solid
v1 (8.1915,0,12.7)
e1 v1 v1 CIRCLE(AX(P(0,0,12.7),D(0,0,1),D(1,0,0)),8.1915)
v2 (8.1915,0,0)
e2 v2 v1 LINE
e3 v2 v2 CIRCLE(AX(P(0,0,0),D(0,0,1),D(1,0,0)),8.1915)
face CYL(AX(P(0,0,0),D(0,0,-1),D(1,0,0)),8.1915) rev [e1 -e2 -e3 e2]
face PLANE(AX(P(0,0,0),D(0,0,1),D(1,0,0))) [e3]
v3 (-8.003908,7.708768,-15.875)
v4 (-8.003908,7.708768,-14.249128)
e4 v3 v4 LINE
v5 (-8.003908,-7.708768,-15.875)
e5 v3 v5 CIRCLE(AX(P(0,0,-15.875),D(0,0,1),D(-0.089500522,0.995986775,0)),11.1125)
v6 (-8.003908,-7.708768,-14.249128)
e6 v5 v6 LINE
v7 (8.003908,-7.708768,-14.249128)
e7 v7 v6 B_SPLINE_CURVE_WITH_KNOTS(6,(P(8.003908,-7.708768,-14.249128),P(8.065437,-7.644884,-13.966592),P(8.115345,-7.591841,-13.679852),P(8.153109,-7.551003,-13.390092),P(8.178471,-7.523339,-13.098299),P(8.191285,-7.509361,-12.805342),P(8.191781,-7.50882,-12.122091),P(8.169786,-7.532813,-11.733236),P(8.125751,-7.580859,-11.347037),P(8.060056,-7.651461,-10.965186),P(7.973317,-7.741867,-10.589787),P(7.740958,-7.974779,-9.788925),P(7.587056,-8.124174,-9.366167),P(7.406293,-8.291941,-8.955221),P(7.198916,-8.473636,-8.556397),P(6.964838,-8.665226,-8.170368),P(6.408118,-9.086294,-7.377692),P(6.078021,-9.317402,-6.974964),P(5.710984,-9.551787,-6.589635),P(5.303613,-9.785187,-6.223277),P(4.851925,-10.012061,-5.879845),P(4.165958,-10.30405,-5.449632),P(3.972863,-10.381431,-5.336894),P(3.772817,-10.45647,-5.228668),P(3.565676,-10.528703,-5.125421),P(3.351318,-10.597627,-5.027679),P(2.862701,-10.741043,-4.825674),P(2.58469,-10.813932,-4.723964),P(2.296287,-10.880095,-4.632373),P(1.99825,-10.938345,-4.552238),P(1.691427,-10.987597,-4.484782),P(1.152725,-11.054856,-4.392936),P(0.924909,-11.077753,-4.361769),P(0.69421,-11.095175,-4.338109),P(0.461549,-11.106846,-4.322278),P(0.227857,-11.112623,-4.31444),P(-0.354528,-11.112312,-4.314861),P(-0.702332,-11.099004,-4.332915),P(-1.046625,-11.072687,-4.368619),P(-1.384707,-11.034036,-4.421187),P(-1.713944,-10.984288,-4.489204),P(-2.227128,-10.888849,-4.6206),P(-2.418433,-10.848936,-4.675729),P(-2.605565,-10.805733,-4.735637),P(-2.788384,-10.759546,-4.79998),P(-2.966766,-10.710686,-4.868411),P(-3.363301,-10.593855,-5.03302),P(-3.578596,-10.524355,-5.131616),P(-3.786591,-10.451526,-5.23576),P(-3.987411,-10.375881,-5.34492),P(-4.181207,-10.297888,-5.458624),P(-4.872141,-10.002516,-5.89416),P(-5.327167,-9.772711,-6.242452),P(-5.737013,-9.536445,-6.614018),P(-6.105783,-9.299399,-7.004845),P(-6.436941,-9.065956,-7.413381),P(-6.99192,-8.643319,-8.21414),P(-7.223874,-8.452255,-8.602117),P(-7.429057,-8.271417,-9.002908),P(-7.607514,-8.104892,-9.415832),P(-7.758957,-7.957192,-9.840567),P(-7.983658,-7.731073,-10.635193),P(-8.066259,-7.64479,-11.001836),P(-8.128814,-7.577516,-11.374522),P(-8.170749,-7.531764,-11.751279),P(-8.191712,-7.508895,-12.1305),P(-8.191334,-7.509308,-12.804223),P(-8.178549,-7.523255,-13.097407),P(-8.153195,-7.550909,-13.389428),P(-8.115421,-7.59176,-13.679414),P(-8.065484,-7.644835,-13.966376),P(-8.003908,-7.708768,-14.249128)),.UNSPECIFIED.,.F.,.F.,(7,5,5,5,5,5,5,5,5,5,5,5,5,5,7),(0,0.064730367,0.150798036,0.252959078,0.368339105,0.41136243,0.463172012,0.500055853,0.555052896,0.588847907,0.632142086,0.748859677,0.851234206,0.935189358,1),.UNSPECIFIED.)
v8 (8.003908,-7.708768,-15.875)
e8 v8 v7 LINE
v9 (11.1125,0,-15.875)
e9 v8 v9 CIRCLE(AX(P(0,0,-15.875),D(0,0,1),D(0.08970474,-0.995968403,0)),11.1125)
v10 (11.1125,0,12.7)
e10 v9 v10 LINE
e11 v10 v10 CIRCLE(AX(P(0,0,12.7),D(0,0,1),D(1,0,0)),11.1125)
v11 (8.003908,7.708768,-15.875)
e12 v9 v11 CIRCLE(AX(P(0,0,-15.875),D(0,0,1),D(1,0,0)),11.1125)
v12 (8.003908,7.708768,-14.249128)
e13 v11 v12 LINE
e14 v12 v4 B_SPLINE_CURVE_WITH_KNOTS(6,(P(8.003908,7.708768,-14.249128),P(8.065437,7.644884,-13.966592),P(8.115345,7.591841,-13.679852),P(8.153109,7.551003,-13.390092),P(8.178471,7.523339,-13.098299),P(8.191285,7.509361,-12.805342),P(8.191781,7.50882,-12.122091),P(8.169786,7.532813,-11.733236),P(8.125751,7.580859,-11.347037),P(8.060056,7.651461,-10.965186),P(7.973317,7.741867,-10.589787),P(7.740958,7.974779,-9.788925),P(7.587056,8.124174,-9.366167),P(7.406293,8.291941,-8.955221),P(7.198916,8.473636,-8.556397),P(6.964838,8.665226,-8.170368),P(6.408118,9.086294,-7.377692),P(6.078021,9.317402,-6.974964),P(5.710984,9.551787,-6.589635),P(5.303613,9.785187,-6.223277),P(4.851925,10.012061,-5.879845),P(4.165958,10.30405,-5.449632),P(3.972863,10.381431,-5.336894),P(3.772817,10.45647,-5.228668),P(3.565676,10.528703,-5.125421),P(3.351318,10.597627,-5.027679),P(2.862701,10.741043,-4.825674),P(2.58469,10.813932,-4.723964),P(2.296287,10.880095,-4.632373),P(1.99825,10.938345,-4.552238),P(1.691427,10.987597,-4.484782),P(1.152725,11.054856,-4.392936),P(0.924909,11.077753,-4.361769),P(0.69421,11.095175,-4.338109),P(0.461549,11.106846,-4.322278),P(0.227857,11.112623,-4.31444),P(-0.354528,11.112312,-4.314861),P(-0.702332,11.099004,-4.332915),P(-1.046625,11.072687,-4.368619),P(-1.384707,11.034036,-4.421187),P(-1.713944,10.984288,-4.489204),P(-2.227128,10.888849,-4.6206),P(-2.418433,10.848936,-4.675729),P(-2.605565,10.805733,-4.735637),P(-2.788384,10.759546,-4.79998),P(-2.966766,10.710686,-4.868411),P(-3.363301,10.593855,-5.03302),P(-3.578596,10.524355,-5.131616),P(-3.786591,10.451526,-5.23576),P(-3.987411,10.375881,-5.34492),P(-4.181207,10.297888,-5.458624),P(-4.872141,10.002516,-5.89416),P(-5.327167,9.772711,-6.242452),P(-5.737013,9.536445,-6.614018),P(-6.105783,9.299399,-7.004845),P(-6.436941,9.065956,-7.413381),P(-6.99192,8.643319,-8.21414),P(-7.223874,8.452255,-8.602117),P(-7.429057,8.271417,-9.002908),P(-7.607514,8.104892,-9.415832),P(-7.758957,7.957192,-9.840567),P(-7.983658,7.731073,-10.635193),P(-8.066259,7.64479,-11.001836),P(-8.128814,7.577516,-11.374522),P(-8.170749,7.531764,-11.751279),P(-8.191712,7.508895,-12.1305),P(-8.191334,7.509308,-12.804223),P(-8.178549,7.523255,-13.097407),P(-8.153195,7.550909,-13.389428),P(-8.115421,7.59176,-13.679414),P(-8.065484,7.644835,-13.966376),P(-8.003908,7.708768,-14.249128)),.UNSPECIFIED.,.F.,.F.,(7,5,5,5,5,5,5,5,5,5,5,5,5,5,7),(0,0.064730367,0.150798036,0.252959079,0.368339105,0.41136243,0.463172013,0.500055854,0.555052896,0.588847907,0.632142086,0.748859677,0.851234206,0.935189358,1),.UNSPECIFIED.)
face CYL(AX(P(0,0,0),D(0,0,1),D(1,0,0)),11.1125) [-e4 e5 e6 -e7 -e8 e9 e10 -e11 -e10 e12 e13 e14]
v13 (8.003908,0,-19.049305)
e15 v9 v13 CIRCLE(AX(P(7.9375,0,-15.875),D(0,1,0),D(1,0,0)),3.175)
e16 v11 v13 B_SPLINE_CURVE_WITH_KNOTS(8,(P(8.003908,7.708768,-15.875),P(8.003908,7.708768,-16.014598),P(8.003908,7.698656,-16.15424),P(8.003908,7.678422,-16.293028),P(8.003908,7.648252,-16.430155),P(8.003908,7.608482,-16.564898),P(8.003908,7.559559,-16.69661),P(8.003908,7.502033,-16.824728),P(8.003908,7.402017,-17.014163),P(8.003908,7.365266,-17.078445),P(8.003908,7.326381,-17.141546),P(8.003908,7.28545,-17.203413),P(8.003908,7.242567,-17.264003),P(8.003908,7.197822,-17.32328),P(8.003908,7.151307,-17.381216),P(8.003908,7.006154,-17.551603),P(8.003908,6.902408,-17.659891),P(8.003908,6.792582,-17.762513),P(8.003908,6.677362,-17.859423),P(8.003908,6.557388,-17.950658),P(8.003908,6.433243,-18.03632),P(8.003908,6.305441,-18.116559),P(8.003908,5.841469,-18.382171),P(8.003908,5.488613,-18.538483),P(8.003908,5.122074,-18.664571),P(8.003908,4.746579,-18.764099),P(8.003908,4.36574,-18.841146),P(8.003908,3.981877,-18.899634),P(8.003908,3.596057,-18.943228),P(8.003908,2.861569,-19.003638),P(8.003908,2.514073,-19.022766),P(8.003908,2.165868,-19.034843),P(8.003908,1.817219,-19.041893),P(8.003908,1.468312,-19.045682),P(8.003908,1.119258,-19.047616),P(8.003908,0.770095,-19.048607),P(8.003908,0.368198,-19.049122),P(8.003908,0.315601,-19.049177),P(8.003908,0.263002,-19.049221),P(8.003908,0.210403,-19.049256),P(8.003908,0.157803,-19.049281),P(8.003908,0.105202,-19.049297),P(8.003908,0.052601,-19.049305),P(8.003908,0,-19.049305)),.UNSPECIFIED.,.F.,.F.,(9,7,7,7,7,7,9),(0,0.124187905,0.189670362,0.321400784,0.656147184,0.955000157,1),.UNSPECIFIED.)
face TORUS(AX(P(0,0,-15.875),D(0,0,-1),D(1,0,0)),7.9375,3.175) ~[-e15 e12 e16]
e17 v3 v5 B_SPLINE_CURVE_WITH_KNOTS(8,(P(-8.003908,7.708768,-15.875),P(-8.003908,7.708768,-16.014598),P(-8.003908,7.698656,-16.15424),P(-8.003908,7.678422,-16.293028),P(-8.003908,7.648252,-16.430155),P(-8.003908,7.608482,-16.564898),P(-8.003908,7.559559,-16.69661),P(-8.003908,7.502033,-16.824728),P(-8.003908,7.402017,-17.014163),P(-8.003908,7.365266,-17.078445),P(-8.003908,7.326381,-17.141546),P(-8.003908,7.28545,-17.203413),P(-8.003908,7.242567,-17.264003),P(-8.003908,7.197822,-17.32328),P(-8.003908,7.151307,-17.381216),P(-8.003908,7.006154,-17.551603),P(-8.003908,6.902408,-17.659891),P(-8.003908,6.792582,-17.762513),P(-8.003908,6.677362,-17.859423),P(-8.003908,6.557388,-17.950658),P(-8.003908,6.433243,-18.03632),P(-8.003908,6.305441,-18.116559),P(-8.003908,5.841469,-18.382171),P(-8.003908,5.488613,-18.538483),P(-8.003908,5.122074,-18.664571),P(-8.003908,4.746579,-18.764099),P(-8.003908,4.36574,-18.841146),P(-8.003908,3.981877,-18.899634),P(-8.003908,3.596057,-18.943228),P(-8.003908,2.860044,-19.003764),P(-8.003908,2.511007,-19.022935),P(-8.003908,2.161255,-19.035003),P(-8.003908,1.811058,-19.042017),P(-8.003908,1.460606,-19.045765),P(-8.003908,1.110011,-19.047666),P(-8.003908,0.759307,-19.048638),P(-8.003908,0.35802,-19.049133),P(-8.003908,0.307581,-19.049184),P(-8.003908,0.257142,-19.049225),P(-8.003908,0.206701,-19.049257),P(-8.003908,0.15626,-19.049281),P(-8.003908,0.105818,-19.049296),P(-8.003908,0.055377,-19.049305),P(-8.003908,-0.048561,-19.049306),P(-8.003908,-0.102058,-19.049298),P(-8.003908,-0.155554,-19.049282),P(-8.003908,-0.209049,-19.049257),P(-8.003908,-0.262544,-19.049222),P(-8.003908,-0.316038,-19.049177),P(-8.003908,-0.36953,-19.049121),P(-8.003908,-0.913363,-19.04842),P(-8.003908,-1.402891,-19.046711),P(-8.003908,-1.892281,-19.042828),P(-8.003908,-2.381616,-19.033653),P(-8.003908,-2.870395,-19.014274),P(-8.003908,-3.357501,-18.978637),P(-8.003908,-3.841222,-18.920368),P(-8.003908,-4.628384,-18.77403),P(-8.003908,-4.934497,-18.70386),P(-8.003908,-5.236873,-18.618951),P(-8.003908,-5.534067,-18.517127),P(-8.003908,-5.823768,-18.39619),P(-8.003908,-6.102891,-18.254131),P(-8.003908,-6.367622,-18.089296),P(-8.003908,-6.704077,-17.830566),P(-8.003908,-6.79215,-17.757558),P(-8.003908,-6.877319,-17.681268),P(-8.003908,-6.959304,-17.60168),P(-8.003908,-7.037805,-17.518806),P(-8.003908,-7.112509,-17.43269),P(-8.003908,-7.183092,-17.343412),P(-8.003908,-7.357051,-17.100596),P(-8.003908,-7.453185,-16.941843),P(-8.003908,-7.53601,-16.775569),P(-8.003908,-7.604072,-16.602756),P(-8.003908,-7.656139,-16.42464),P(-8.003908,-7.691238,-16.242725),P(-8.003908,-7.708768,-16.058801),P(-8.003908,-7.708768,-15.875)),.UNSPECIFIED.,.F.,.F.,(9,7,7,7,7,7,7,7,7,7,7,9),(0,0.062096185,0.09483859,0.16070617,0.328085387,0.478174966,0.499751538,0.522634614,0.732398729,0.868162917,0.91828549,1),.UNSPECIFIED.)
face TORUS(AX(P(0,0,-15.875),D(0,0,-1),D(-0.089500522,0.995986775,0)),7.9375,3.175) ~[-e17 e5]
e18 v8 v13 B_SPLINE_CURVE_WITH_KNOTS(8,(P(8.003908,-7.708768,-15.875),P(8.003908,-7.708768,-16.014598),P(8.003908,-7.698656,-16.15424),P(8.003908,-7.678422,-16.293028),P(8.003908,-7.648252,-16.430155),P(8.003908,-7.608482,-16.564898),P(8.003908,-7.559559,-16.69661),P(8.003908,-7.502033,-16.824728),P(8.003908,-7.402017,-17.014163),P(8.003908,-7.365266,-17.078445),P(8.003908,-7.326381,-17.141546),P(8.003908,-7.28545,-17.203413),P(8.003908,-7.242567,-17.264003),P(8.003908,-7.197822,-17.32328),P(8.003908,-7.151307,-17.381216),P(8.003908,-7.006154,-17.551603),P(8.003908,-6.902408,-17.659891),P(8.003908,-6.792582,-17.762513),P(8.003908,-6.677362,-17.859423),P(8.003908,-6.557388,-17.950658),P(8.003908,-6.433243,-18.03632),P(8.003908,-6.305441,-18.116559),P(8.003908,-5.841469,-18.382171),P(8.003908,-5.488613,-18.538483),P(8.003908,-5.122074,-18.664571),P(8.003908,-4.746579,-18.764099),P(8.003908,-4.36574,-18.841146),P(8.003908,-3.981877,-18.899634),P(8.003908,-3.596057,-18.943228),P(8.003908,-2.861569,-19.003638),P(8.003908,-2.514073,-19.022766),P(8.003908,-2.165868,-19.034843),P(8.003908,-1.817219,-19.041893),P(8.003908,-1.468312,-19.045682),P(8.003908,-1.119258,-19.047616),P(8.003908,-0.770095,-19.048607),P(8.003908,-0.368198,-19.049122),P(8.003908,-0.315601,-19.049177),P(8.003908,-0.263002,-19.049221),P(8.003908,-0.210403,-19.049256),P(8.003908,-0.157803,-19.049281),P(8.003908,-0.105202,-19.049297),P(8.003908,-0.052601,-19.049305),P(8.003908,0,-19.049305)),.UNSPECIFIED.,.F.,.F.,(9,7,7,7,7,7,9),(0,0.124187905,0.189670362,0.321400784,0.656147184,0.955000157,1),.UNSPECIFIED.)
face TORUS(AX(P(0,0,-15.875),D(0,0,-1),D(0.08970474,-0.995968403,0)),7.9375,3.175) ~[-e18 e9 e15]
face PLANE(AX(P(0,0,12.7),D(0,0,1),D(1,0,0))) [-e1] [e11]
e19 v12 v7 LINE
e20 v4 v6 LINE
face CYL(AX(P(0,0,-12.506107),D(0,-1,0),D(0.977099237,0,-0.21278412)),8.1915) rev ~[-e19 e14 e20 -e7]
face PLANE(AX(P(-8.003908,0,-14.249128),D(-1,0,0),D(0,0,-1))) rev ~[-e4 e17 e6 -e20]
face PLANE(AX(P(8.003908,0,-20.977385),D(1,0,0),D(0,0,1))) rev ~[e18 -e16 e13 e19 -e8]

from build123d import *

# Parameters (mm, degrees)
F0_R        = 11.1125
F0_R_2      = 8.1915
F1_DEPTH    = 12.7
F2_R        = 11.1125
F3_DEPTH    = 19.05
F5_DEPTH    = 19.05
F6_T2_ANGLE = 169.7302536888
F6_T4_ANGLE = 84.8533787692
F6_T6_ANGLE = 84.8533787692


# Not quite as in the source:
# - a fillet or chamfer that OpenCascade refuses, or shapes differently, is made with other operations: its cross-section is extruded or revolved along the edge and cut away or added


with BuildPart() as f1:
    # F0 (on Top) → F1 (new body)
    with BuildSketch(Plane.XY):
        Circle(F0_R)
        Circle(F0_R_2, mode=Mode.SUBTRACT)
    extrude(amount=F1_DEPTH)

    # F2 (on Top) → F3 (join)
    with BuildSketch(Plane.XY):
        Circle(F2_R)
    extrude(amount=-F3_DEPTH)

    # F4 (on Front) → F5 (cut, symmetric)
    with BuildSketch(Plane.XZ):
        with BuildLine():
            Line((8.0039083969, -20.9773854417), (8.0039083969, -14.2491279898))
            ThreePointArc((8.0039083969, -14.2491279898), (6.3788176707, -7.3669087446), (0, -4.3146068702))
            ThreePointArc((0, -4.3146068702), (-6.3788176707, -7.3669087446), (-8.0039083969, -14.2491279898))
            Line((-8.0039083969, -14.2491279898), (-8.0039083969, -20.9773854417))
            Line((-8.0039083969, -20.9773854417), (8.0039083969, -20.9773854417))
        make_face()
    extrude(amount=F5_DEPTH, both=True, mode=Mode.SUBTRACT)

    # F6: fillet of radius 3.175 on 3 edges, made by hand

    # F6_s1 → F6_t2 (revolve, cut)
    with BuildSketch(Plane(origin=(0, 0, 0), x_dir=(0, 0, 1), z_dir=(0.9959867753, 0.0895005221, 0))):
        with BuildLine():
            ThreePointArc((-15.875, -11.1125), (-18.1200640303, -10.1825640303), (-19.05, -7.9375))
            Line((-19.05, -7.9375), (-19.05, -11.1125))
            Line((-19.05, -11.1125), (-15.875, -11.1125))
        make_face()
    revolve(axis=Axis((0, 0, -19.05), (0, 0, 1)), revolution_arc=F6_T2_ANGLE, mode=Mode.SUBTRACT)

    # F6_s3 → F6_t4 (revolve, cut)
    with BuildSketch(Plane(origin=(0, 0, 0), x_dir=(0, 0, 1), z_dir=(-0.9959684029, -0.08970474, 0))):
        with BuildLine():
            ThreePointArc((-15.875, -11.1125), (-18.1200640303, -10.1825640303), (-19.05, -7.9375))
            Line((-19.05, -7.9375), (-19.05, -11.1125))
            Line((-19.05, -11.1125), (-15.875, -11.1125))
        make_face()
    revolve(axis=Axis((0, 0, -19.05), (0, 0, 1)), revolution_arc=F6_T4_ANGLE, mode=Mode.SUBTRACT)

    # F6_s5 → F6_t6 (revolve, cut)
    with BuildSketch(Plane.XZ):
        with BuildLine():
            ThreePointArc((11.1125, -15.875), (10.1825640303, -18.1200640303), (7.9375, -19.05))
            Line((7.9375, -19.05), (11.1125, -19.05))
            Line((11.1125, -19.05), (11.1125, -15.875))
        make_face()
    revolve(axis=Axis((0, 0, -19.05), (0, 0, 1)), revolution_arc=F6_T6_ANGLE, mode=Mode.SUBTRACT)


solid = f1.part
